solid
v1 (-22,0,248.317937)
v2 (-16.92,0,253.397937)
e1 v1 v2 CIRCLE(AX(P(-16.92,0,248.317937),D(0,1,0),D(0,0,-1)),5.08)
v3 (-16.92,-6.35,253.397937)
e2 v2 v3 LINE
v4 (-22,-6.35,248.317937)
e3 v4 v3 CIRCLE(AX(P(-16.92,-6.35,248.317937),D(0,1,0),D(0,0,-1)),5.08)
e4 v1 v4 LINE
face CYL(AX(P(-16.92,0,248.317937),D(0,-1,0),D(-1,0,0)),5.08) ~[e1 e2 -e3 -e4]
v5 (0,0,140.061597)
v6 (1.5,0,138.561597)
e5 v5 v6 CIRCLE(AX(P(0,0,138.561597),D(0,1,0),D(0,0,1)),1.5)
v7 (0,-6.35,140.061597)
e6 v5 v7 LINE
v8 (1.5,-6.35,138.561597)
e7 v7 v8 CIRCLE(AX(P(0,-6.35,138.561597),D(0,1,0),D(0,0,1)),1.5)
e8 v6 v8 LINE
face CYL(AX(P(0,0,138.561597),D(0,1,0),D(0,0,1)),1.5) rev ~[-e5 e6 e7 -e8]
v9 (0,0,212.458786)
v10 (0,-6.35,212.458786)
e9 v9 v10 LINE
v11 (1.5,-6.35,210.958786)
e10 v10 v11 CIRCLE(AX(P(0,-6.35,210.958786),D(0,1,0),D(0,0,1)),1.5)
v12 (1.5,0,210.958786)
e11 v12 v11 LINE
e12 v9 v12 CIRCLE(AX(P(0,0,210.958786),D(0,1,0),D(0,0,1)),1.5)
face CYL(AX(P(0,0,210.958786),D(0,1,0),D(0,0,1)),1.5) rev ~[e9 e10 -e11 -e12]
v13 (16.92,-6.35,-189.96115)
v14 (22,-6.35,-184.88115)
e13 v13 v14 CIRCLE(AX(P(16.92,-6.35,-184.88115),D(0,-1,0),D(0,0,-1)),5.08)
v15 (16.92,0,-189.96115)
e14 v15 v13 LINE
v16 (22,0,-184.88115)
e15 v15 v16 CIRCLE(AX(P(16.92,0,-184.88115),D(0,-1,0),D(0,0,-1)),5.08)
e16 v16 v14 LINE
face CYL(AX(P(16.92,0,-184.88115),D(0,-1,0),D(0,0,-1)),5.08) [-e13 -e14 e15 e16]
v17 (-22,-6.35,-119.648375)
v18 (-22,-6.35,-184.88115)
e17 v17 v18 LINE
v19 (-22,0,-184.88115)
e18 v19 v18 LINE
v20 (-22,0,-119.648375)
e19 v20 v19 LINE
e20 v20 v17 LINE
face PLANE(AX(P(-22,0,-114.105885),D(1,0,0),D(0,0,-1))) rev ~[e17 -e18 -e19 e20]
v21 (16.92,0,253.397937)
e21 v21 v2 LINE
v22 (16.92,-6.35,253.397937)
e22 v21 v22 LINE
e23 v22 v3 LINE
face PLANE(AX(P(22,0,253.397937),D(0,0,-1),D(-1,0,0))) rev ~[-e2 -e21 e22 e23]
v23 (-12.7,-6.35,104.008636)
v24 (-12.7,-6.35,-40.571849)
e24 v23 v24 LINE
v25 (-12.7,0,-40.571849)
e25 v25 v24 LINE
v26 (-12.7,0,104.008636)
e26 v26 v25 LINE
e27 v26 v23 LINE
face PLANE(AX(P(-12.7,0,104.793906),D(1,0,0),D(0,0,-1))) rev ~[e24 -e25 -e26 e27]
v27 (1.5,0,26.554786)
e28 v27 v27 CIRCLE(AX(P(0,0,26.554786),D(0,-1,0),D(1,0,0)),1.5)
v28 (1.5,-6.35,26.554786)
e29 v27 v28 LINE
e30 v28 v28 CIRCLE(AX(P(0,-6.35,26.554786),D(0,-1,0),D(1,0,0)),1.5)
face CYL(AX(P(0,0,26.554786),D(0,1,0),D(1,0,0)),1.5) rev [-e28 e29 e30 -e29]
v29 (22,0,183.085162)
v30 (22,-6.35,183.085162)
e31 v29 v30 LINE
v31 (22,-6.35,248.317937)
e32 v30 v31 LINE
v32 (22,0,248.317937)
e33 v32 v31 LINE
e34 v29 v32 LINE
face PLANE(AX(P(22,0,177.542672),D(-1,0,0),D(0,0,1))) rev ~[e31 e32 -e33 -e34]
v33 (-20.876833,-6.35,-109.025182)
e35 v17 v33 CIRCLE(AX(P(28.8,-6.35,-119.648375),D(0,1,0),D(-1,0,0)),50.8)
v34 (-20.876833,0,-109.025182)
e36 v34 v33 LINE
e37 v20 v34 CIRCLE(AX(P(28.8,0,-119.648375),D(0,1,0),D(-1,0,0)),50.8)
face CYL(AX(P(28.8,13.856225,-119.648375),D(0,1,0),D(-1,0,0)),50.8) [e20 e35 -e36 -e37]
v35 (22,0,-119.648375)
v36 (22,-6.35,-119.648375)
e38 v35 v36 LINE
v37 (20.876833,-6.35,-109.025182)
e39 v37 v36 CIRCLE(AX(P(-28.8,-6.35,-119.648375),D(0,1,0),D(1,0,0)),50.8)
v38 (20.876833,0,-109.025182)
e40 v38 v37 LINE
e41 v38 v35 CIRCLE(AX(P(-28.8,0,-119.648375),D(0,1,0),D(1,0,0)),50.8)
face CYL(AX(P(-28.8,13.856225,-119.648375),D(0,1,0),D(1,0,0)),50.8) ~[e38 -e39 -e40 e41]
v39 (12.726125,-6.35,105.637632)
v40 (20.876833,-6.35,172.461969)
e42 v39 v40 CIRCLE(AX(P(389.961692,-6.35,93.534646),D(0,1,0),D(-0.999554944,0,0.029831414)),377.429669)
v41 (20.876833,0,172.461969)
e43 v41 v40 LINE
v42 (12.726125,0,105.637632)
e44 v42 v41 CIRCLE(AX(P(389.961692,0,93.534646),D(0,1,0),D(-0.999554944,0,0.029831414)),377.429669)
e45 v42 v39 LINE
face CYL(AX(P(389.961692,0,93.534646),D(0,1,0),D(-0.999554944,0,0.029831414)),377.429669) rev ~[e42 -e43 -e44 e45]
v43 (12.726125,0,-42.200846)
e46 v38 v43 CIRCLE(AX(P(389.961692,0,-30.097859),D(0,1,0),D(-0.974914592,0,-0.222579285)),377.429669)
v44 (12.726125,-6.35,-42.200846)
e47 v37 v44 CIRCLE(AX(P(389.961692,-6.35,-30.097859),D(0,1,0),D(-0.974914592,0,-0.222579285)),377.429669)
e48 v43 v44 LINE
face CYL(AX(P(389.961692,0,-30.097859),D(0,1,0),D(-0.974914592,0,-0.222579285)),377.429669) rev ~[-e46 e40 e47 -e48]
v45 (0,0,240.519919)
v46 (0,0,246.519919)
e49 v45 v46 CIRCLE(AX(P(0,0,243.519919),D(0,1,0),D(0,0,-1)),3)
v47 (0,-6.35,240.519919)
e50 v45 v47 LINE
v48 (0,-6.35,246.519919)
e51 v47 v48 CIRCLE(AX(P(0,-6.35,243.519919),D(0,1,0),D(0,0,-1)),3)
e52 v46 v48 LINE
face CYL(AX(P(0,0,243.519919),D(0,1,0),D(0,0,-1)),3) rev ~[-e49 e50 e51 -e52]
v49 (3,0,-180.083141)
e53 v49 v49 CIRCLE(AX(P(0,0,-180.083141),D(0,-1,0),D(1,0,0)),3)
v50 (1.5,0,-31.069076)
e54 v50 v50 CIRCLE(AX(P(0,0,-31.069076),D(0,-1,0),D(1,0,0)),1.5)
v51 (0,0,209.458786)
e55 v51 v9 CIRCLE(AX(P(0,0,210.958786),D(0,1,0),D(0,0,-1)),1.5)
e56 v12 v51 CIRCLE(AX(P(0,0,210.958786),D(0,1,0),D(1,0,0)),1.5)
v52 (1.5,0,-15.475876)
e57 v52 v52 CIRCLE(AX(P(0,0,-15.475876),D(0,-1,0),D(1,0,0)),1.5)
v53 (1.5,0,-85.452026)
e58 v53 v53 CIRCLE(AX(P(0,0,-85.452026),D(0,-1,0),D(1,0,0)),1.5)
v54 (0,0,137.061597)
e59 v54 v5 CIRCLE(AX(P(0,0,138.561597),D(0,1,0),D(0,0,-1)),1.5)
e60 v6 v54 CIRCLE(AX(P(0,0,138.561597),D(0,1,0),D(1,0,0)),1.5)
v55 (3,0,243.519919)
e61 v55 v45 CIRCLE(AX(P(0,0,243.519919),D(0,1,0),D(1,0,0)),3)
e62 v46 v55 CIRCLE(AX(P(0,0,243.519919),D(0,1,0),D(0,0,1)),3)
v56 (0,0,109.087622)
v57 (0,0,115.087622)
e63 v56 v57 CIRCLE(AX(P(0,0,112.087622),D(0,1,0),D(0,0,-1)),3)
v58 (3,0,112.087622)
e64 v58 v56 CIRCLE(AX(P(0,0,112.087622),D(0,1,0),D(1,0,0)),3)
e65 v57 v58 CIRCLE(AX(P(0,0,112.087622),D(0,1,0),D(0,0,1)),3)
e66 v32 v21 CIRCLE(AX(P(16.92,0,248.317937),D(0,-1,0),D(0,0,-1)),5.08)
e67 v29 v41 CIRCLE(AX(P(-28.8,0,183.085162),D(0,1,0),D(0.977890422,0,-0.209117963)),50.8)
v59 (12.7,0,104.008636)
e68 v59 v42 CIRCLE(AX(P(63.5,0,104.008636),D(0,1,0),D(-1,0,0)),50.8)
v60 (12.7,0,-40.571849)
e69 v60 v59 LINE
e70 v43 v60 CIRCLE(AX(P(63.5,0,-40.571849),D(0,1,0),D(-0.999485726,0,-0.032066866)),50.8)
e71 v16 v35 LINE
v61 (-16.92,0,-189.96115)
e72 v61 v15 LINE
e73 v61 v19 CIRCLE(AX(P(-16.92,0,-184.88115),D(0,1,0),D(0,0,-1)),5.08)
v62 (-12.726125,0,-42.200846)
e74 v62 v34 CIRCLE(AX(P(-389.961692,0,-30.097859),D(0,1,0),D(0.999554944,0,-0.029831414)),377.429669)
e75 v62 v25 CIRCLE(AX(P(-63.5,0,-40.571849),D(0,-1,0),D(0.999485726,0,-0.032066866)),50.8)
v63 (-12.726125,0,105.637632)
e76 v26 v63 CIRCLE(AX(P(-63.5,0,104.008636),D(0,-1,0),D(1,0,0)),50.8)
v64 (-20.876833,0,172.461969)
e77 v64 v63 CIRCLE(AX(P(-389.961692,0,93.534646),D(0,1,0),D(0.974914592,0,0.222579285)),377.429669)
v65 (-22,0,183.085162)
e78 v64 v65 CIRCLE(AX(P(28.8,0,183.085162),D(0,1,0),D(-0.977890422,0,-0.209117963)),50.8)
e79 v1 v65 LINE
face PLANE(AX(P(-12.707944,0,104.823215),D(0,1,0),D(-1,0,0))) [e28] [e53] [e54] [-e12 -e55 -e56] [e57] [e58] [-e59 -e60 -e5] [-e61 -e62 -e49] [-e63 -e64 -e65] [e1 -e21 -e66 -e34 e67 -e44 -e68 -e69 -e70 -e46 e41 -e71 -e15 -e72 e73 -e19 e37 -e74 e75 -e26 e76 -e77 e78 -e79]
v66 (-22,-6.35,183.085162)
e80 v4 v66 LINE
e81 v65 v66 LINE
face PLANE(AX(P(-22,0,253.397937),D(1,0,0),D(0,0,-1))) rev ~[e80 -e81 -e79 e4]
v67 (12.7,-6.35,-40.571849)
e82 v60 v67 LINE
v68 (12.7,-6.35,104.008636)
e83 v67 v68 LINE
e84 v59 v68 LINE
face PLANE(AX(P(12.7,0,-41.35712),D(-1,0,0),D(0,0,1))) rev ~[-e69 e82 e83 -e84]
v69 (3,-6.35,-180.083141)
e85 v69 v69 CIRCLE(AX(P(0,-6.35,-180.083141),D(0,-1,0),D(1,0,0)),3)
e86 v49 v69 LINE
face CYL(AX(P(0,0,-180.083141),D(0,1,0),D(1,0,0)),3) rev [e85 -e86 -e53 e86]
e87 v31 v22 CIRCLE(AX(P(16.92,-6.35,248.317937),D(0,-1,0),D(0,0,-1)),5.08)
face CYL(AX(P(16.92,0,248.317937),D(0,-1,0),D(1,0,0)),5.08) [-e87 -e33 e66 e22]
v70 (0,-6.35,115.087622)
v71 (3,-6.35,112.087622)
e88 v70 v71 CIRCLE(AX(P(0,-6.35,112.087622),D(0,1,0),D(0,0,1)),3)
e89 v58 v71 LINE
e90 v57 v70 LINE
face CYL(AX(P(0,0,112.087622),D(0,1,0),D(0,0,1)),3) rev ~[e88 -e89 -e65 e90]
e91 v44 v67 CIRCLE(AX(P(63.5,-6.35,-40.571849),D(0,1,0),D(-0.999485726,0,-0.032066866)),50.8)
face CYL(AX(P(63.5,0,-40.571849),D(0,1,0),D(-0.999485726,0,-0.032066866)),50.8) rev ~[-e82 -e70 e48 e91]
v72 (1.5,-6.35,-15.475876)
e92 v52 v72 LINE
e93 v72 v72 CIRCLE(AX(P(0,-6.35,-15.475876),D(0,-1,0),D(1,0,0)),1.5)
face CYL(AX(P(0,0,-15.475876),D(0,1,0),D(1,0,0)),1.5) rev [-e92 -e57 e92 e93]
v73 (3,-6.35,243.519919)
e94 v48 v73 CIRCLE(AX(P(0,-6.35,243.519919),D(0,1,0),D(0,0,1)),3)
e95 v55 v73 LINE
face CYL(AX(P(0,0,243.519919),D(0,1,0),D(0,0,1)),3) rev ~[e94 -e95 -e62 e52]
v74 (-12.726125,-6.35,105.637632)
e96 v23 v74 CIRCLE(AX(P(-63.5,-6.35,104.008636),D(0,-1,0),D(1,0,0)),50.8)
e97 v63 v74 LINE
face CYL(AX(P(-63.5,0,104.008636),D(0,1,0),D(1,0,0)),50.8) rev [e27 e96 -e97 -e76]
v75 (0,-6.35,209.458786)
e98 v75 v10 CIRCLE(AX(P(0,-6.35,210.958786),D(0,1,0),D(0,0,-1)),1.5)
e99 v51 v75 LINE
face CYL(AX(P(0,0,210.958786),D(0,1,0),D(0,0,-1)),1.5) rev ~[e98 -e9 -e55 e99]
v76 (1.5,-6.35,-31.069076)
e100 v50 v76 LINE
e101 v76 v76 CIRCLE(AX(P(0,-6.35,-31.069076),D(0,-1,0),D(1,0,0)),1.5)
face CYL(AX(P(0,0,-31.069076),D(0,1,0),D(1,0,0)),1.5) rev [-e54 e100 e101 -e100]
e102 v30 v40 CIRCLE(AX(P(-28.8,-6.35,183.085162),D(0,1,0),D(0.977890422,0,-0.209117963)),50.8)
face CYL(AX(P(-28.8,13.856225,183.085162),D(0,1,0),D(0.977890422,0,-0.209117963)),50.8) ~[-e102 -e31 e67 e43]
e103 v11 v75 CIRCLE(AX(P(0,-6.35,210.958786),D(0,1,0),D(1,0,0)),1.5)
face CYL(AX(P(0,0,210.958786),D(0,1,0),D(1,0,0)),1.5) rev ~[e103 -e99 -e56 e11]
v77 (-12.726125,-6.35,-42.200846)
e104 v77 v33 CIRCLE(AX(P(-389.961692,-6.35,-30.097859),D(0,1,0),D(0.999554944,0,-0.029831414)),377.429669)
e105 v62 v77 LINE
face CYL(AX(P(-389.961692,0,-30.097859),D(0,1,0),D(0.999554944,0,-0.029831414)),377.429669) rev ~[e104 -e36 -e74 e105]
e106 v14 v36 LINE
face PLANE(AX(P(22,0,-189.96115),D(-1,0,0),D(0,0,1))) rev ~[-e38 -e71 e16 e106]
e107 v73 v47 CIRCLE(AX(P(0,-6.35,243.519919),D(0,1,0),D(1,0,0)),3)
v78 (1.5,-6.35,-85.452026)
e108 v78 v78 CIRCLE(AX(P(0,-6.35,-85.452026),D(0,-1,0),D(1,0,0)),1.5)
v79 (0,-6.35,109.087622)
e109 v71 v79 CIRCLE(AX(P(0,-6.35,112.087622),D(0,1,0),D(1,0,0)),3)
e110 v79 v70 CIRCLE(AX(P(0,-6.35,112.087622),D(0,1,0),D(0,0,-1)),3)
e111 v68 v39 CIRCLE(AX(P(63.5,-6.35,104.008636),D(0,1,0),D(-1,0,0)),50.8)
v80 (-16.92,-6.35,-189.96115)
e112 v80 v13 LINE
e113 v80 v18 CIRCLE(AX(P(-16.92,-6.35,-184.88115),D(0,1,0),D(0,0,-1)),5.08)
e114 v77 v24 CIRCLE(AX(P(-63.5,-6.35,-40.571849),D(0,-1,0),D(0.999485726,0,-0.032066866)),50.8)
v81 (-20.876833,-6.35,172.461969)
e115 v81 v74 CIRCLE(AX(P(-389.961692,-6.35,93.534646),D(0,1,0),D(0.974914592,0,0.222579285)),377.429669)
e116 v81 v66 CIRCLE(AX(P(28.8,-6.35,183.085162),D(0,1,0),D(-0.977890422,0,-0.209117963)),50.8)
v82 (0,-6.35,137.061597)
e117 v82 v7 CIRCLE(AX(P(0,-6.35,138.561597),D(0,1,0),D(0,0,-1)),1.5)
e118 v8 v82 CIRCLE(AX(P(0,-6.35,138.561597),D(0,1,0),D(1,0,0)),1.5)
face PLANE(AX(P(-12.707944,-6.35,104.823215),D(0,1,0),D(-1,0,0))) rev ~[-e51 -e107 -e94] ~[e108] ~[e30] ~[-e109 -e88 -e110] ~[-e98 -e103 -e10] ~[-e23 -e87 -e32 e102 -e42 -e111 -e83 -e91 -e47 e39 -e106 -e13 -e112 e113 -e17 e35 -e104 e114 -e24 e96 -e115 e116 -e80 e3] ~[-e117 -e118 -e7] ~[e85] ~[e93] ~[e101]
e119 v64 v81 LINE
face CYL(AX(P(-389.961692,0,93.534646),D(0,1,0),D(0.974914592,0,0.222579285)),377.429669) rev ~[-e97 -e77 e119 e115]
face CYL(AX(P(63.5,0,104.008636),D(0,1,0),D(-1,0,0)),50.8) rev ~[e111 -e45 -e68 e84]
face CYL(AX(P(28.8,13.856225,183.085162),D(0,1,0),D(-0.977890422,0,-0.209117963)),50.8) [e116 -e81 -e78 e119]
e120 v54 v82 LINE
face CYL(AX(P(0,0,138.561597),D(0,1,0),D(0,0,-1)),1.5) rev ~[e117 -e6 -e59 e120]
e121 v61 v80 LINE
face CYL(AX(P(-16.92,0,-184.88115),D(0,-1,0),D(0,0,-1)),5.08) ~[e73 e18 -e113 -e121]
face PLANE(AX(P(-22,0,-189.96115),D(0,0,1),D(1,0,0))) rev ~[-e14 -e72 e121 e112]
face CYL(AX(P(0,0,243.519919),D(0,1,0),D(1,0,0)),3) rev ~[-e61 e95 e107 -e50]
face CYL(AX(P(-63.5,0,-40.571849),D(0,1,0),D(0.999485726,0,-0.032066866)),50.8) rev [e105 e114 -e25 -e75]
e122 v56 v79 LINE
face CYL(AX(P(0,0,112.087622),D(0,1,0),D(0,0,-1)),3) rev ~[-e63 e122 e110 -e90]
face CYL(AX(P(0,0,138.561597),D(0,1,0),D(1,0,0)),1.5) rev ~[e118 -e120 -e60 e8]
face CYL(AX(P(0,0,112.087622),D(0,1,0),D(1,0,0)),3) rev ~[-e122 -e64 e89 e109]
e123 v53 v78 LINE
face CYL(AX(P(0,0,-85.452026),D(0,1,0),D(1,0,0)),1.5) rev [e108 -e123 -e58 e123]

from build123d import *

# Parameters (mm, degrees)
F0_R        = 3
F0_R_2      = 1.5
F1_DEPTH    = 6.35
F2_R        = 5.08
F3_T1_DEPTH = 6.35
F3_T3_DEPTH = 34.0624500619


# Not quite as in the source:
# - a fillet or chamfer that OpenCascade refuses, or shapes differently, is made with other operations: its cross-section is extruded or revolved along the edge and cut away or added
# - a feature names something its author has since deleted; it is built from what else it names


with BuildPart() as f1:
    # F0 (on Front) → F1 (new body)
    with BuildSketch(Plane.XZ):
        with BuildLine():
            Line((-22, -189.9611499309), (-4.6853246795, -189.9611499309))
            Line((-4.6853246795, -189.9611499309), (4.6853246795, -189.9611499309))
            Line((4.6853246795, -189.9611499309), (22, -189.9611499309))
            Line((22, -189.9611499309), (22, -172.8709284505))
            Line((22, -172.8709284505), (22, -114.1058849427))
            ThreePointArc((22, -114.1058849427), (15.5787747464, -77.9579307824), (12.7, -41.3571195934))
            Line((12.7, -41.3571195934), (12.7, 104.7939062119))
            ThreePointArc((12.7, 104.7939062119), (15.5787747464, 141.3947174009), (22, 177.5426715612))
            Line((22, 177.5426715612), (22, 225.4278063774))
            Line((22, 225.4278063774), (22, 236.307715069))
            Line((22, 236.307715069), (22, 253.3979365494))
            Line((22, 253.3979365494), (4.6853246795, 253.3979365494))
            Line((4.6853246795, 253.3979365494), (0, 253.3979365494))
            Line((0, 253.3979365494), (-4.6853246795, 253.3979365494))
            Line((-4.6853246795, 253.3979365494), (-22, 253.3979365494))
            Line((-22, 253.3979365494), (-22, 236.307715069))
            Line((-22, 236.307715069), (-22, 225.4278063774))
            Line((-22, 225.4278063774), (-22, 177.5426715612))
            ThreePointArc((-22, 177.5426715612), (-15.5787747464, 141.3947174009), (-12.7, 104.7939062119))
            Line((-12.7, 104.7939062119), (-12.7, -41.3571195934))
            ThreePointArc((-12.7, -41.3571195934), (-15.5787747464, -77.9579307824), (-22, -114.1058849427))
            Line((-22, -114.1058849427), (-22, -161.9910197589))
            Line((-22, -161.9910197589), (-22, -189.9611499309))
        make_face()
        with Locations((0, -180.0831407309)):
            Circle(F0_R, mode=Mode.SUBTRACT)
        with Locations((0, -85.4520261312)):
            Circle(F0_R_2, mode=Mode.SUBTRACT)
        with Locations((0, -31.0690756887)):
            Circle(F0_R_2, mode=Mode.SUBTRACT)
        with Locations((0, -15.4758756887)):
            Circle(F0_R_2, mode=Mode.SUBTRACT)
        with Locations((0, 26.5547856688)):
            Circle(F0_R_2, mode=Mode.SUBTRACT)
        with BuildLine():
            ThreePointArc((0, 109.0876222849), (-3, 112.0876222849), (0, 115.0876222849))
            ThreePointArc((0, 115.0876222849), (2.1213203436, 114.2089426284), (3, 112.0876222849))
            ThreePointArc((3, 112.0876222849), (2.1213203436, 109.9663019413), (0, 109.0876222849))
        make_face(mode=Mode.SUBTRACT)
        with BuildLine():
            ThreePointArc((0, 137.0615974688), (-1.5, 138.5615974688), (0, 140.0615974688))
            ThreePointArc((0, 140.0615974688), (1.0606601718, 139.6222576406), (1.5, 138.5615974688))
            ThreePointArc((1.5, 138.5615974688), (1.0606601718, 137.5009372971), (0, 137.0615974688))
        make_face(mode=Mode.SUBTRACT)
        with BuildLine():
            ThreePointArc((0, 209.4587856688), (-1.5, 210.9587856688), (0, 212.4587856688))
            ThreePointArc((0, 212.4587856688), (1.0606601718, 212.0194458406), (1.5, 210.9587856688))
            ThreePointArc((1.5, 210.9587856688), (1.0606601718, 209.8981254971), (0, 209.4587856688))
        make_face(mode=Mode.SUBTRACT)
        with BuildLine():
            ThreePointArc((0, 240.5199192026), (-3, 243.5199192026), (0, 246.5199192026))
            ThreePointArc((0, 246.5199192026), (2.1213203436, 245.6412395461), (3, 243.5199192026))
            ThreePointArc((3, 243.5199192026), (2.1213203436, 241.398598859), (0, 240.5199192026))
        make_face(mode=Mode.SUBTRACT)
    extrude(amount=F1_DEPTH)

    # F2
    f2_edges = [f1.edges().sort_by_distance(p)[0] for p in [
        (-22, -3.175, 253.397937),
        (22, -3.175, 253.397937),
        (22, -3.175, -189.96115),
        (-22, -3.175, -189.96115),
    ]]
    fillet(f2_edges, radius=F2_R)

    # F3: fillet of radius 50.8 on 8 edges, made by hand

    # F3_s2 → F3_t1 (join)
    with BuildSketch(Plane.XZ):
        with BuildLine():
            ThreePointArc((-12.7, 104.0086355302), (-12.7065317021, 104.8232386677), (-12.7261251288, 105.6376323271))
            ThreePointArc((-12.7261251288, 105.6376323271), (-12.7128266876, 105.2157765732), (-12.7, 104.7939062119))
            Line((-12.7, 104.7939062119), (-12.7, 104.0086355302))
        make_face()
        with BuildLine():
            ThreePointArc((12.7, 104.0086355302), (12.7065317021, 104.8232386677), (12.7261251288, 105.6376323271))
            ThreePointArc((12.7261251288, 105.6376323271), (12.7128266876, 105.2157765732), (12.7, 104.7939062119))
            Line((12.7, 104.7939062119), (12.7, 104.0086355302))
        make_face()
        with BuildLine():
            ThreePointArc((12.7261251288, -42.2008457086), (12.7065317021, -41.3864520492), (12.7, -40.5718489117))
            Line((12.7, -40.5718489117), (12.7, -41.3571195934))
            ThreePointArc((12.7, -41.3571195934), (12.7128266876, -41.7789899547), (12.7261251288, -42.2008457086))
        make_face()
        with BuildLine():
            ThreePointArc((-12.7261251288, -42.2008457086), (-12.7065317021, -41.3864520492), (-12.7, -40.5718489116))
            Line((-12.7, -40.5718489116), (-12.7, -41.3571195934))
            ThreePointArc((-12.7, -41.3571195934), (-12.7128266876, -41.7789899547), (-12.7261251288, -42.2008457086))
        make_face()
    extrude(amount=F3_T1_DEPTH)

    # F3_s4 → F3_t3 (cut)
    with BuildSketch(Plane.XZ.offset(-13.856225031)):
        with BuildLine():
            ThreePointArc((-22, -119.6483749551), (-21.7184280188, -114.3071737314), (-20.8768334444, -109.025182453))
            ThreePointArc((-20.8768334444, -109.025182453), (-21.429661091, -111.5674692633), (-22, -114.1058849427))
            Line((-22, -114.1058849427), (-22, -119.6483749551))
        make_face()
        with BuildLine():
            ThreePointArc((22, -119.6483749551), (21.7184280188, -114.3071737314), (20.8768334444, -109.025182453))
            ThreePointArc((20.8768334444, -109.025182453), (21.429661091, -111.5674692633), (22, -114.1058849427))
            Line((22, -114.1058849427), (22, -119.6483749551))
        make_face()
        with BuildLine():
            ThreePointArc((20.8768334444, 172.4619690715), (21.7184280188, 177.7439603499), (22, 183.0851615736))
            Line((22, 183.0851615736), (22, 177.5426715612))
            ThreePointArc((22, 177.5426715612), (21.429661091, 175.0042558818), (20.8768334444, 172.4619690715))
        make_face()
        with BuildLine():
            ThreePointArc((-20.8768334444, 172.4619690715), (-21.7184280188, 177.7439603499), (-22, 183.0851615736))
            Line((-22, 183.0851615736), (-22, 177.5426715612))
            ThreePointArc((-22, 177.5426715612), (-21.429661091, 175.0042558818), (-20.8768334444, 172.4619690715))
        make_face()
    extrude(amount=F3_T3_DEPTH, mode=Mode.SUBTRACT)


solid = f1.part
